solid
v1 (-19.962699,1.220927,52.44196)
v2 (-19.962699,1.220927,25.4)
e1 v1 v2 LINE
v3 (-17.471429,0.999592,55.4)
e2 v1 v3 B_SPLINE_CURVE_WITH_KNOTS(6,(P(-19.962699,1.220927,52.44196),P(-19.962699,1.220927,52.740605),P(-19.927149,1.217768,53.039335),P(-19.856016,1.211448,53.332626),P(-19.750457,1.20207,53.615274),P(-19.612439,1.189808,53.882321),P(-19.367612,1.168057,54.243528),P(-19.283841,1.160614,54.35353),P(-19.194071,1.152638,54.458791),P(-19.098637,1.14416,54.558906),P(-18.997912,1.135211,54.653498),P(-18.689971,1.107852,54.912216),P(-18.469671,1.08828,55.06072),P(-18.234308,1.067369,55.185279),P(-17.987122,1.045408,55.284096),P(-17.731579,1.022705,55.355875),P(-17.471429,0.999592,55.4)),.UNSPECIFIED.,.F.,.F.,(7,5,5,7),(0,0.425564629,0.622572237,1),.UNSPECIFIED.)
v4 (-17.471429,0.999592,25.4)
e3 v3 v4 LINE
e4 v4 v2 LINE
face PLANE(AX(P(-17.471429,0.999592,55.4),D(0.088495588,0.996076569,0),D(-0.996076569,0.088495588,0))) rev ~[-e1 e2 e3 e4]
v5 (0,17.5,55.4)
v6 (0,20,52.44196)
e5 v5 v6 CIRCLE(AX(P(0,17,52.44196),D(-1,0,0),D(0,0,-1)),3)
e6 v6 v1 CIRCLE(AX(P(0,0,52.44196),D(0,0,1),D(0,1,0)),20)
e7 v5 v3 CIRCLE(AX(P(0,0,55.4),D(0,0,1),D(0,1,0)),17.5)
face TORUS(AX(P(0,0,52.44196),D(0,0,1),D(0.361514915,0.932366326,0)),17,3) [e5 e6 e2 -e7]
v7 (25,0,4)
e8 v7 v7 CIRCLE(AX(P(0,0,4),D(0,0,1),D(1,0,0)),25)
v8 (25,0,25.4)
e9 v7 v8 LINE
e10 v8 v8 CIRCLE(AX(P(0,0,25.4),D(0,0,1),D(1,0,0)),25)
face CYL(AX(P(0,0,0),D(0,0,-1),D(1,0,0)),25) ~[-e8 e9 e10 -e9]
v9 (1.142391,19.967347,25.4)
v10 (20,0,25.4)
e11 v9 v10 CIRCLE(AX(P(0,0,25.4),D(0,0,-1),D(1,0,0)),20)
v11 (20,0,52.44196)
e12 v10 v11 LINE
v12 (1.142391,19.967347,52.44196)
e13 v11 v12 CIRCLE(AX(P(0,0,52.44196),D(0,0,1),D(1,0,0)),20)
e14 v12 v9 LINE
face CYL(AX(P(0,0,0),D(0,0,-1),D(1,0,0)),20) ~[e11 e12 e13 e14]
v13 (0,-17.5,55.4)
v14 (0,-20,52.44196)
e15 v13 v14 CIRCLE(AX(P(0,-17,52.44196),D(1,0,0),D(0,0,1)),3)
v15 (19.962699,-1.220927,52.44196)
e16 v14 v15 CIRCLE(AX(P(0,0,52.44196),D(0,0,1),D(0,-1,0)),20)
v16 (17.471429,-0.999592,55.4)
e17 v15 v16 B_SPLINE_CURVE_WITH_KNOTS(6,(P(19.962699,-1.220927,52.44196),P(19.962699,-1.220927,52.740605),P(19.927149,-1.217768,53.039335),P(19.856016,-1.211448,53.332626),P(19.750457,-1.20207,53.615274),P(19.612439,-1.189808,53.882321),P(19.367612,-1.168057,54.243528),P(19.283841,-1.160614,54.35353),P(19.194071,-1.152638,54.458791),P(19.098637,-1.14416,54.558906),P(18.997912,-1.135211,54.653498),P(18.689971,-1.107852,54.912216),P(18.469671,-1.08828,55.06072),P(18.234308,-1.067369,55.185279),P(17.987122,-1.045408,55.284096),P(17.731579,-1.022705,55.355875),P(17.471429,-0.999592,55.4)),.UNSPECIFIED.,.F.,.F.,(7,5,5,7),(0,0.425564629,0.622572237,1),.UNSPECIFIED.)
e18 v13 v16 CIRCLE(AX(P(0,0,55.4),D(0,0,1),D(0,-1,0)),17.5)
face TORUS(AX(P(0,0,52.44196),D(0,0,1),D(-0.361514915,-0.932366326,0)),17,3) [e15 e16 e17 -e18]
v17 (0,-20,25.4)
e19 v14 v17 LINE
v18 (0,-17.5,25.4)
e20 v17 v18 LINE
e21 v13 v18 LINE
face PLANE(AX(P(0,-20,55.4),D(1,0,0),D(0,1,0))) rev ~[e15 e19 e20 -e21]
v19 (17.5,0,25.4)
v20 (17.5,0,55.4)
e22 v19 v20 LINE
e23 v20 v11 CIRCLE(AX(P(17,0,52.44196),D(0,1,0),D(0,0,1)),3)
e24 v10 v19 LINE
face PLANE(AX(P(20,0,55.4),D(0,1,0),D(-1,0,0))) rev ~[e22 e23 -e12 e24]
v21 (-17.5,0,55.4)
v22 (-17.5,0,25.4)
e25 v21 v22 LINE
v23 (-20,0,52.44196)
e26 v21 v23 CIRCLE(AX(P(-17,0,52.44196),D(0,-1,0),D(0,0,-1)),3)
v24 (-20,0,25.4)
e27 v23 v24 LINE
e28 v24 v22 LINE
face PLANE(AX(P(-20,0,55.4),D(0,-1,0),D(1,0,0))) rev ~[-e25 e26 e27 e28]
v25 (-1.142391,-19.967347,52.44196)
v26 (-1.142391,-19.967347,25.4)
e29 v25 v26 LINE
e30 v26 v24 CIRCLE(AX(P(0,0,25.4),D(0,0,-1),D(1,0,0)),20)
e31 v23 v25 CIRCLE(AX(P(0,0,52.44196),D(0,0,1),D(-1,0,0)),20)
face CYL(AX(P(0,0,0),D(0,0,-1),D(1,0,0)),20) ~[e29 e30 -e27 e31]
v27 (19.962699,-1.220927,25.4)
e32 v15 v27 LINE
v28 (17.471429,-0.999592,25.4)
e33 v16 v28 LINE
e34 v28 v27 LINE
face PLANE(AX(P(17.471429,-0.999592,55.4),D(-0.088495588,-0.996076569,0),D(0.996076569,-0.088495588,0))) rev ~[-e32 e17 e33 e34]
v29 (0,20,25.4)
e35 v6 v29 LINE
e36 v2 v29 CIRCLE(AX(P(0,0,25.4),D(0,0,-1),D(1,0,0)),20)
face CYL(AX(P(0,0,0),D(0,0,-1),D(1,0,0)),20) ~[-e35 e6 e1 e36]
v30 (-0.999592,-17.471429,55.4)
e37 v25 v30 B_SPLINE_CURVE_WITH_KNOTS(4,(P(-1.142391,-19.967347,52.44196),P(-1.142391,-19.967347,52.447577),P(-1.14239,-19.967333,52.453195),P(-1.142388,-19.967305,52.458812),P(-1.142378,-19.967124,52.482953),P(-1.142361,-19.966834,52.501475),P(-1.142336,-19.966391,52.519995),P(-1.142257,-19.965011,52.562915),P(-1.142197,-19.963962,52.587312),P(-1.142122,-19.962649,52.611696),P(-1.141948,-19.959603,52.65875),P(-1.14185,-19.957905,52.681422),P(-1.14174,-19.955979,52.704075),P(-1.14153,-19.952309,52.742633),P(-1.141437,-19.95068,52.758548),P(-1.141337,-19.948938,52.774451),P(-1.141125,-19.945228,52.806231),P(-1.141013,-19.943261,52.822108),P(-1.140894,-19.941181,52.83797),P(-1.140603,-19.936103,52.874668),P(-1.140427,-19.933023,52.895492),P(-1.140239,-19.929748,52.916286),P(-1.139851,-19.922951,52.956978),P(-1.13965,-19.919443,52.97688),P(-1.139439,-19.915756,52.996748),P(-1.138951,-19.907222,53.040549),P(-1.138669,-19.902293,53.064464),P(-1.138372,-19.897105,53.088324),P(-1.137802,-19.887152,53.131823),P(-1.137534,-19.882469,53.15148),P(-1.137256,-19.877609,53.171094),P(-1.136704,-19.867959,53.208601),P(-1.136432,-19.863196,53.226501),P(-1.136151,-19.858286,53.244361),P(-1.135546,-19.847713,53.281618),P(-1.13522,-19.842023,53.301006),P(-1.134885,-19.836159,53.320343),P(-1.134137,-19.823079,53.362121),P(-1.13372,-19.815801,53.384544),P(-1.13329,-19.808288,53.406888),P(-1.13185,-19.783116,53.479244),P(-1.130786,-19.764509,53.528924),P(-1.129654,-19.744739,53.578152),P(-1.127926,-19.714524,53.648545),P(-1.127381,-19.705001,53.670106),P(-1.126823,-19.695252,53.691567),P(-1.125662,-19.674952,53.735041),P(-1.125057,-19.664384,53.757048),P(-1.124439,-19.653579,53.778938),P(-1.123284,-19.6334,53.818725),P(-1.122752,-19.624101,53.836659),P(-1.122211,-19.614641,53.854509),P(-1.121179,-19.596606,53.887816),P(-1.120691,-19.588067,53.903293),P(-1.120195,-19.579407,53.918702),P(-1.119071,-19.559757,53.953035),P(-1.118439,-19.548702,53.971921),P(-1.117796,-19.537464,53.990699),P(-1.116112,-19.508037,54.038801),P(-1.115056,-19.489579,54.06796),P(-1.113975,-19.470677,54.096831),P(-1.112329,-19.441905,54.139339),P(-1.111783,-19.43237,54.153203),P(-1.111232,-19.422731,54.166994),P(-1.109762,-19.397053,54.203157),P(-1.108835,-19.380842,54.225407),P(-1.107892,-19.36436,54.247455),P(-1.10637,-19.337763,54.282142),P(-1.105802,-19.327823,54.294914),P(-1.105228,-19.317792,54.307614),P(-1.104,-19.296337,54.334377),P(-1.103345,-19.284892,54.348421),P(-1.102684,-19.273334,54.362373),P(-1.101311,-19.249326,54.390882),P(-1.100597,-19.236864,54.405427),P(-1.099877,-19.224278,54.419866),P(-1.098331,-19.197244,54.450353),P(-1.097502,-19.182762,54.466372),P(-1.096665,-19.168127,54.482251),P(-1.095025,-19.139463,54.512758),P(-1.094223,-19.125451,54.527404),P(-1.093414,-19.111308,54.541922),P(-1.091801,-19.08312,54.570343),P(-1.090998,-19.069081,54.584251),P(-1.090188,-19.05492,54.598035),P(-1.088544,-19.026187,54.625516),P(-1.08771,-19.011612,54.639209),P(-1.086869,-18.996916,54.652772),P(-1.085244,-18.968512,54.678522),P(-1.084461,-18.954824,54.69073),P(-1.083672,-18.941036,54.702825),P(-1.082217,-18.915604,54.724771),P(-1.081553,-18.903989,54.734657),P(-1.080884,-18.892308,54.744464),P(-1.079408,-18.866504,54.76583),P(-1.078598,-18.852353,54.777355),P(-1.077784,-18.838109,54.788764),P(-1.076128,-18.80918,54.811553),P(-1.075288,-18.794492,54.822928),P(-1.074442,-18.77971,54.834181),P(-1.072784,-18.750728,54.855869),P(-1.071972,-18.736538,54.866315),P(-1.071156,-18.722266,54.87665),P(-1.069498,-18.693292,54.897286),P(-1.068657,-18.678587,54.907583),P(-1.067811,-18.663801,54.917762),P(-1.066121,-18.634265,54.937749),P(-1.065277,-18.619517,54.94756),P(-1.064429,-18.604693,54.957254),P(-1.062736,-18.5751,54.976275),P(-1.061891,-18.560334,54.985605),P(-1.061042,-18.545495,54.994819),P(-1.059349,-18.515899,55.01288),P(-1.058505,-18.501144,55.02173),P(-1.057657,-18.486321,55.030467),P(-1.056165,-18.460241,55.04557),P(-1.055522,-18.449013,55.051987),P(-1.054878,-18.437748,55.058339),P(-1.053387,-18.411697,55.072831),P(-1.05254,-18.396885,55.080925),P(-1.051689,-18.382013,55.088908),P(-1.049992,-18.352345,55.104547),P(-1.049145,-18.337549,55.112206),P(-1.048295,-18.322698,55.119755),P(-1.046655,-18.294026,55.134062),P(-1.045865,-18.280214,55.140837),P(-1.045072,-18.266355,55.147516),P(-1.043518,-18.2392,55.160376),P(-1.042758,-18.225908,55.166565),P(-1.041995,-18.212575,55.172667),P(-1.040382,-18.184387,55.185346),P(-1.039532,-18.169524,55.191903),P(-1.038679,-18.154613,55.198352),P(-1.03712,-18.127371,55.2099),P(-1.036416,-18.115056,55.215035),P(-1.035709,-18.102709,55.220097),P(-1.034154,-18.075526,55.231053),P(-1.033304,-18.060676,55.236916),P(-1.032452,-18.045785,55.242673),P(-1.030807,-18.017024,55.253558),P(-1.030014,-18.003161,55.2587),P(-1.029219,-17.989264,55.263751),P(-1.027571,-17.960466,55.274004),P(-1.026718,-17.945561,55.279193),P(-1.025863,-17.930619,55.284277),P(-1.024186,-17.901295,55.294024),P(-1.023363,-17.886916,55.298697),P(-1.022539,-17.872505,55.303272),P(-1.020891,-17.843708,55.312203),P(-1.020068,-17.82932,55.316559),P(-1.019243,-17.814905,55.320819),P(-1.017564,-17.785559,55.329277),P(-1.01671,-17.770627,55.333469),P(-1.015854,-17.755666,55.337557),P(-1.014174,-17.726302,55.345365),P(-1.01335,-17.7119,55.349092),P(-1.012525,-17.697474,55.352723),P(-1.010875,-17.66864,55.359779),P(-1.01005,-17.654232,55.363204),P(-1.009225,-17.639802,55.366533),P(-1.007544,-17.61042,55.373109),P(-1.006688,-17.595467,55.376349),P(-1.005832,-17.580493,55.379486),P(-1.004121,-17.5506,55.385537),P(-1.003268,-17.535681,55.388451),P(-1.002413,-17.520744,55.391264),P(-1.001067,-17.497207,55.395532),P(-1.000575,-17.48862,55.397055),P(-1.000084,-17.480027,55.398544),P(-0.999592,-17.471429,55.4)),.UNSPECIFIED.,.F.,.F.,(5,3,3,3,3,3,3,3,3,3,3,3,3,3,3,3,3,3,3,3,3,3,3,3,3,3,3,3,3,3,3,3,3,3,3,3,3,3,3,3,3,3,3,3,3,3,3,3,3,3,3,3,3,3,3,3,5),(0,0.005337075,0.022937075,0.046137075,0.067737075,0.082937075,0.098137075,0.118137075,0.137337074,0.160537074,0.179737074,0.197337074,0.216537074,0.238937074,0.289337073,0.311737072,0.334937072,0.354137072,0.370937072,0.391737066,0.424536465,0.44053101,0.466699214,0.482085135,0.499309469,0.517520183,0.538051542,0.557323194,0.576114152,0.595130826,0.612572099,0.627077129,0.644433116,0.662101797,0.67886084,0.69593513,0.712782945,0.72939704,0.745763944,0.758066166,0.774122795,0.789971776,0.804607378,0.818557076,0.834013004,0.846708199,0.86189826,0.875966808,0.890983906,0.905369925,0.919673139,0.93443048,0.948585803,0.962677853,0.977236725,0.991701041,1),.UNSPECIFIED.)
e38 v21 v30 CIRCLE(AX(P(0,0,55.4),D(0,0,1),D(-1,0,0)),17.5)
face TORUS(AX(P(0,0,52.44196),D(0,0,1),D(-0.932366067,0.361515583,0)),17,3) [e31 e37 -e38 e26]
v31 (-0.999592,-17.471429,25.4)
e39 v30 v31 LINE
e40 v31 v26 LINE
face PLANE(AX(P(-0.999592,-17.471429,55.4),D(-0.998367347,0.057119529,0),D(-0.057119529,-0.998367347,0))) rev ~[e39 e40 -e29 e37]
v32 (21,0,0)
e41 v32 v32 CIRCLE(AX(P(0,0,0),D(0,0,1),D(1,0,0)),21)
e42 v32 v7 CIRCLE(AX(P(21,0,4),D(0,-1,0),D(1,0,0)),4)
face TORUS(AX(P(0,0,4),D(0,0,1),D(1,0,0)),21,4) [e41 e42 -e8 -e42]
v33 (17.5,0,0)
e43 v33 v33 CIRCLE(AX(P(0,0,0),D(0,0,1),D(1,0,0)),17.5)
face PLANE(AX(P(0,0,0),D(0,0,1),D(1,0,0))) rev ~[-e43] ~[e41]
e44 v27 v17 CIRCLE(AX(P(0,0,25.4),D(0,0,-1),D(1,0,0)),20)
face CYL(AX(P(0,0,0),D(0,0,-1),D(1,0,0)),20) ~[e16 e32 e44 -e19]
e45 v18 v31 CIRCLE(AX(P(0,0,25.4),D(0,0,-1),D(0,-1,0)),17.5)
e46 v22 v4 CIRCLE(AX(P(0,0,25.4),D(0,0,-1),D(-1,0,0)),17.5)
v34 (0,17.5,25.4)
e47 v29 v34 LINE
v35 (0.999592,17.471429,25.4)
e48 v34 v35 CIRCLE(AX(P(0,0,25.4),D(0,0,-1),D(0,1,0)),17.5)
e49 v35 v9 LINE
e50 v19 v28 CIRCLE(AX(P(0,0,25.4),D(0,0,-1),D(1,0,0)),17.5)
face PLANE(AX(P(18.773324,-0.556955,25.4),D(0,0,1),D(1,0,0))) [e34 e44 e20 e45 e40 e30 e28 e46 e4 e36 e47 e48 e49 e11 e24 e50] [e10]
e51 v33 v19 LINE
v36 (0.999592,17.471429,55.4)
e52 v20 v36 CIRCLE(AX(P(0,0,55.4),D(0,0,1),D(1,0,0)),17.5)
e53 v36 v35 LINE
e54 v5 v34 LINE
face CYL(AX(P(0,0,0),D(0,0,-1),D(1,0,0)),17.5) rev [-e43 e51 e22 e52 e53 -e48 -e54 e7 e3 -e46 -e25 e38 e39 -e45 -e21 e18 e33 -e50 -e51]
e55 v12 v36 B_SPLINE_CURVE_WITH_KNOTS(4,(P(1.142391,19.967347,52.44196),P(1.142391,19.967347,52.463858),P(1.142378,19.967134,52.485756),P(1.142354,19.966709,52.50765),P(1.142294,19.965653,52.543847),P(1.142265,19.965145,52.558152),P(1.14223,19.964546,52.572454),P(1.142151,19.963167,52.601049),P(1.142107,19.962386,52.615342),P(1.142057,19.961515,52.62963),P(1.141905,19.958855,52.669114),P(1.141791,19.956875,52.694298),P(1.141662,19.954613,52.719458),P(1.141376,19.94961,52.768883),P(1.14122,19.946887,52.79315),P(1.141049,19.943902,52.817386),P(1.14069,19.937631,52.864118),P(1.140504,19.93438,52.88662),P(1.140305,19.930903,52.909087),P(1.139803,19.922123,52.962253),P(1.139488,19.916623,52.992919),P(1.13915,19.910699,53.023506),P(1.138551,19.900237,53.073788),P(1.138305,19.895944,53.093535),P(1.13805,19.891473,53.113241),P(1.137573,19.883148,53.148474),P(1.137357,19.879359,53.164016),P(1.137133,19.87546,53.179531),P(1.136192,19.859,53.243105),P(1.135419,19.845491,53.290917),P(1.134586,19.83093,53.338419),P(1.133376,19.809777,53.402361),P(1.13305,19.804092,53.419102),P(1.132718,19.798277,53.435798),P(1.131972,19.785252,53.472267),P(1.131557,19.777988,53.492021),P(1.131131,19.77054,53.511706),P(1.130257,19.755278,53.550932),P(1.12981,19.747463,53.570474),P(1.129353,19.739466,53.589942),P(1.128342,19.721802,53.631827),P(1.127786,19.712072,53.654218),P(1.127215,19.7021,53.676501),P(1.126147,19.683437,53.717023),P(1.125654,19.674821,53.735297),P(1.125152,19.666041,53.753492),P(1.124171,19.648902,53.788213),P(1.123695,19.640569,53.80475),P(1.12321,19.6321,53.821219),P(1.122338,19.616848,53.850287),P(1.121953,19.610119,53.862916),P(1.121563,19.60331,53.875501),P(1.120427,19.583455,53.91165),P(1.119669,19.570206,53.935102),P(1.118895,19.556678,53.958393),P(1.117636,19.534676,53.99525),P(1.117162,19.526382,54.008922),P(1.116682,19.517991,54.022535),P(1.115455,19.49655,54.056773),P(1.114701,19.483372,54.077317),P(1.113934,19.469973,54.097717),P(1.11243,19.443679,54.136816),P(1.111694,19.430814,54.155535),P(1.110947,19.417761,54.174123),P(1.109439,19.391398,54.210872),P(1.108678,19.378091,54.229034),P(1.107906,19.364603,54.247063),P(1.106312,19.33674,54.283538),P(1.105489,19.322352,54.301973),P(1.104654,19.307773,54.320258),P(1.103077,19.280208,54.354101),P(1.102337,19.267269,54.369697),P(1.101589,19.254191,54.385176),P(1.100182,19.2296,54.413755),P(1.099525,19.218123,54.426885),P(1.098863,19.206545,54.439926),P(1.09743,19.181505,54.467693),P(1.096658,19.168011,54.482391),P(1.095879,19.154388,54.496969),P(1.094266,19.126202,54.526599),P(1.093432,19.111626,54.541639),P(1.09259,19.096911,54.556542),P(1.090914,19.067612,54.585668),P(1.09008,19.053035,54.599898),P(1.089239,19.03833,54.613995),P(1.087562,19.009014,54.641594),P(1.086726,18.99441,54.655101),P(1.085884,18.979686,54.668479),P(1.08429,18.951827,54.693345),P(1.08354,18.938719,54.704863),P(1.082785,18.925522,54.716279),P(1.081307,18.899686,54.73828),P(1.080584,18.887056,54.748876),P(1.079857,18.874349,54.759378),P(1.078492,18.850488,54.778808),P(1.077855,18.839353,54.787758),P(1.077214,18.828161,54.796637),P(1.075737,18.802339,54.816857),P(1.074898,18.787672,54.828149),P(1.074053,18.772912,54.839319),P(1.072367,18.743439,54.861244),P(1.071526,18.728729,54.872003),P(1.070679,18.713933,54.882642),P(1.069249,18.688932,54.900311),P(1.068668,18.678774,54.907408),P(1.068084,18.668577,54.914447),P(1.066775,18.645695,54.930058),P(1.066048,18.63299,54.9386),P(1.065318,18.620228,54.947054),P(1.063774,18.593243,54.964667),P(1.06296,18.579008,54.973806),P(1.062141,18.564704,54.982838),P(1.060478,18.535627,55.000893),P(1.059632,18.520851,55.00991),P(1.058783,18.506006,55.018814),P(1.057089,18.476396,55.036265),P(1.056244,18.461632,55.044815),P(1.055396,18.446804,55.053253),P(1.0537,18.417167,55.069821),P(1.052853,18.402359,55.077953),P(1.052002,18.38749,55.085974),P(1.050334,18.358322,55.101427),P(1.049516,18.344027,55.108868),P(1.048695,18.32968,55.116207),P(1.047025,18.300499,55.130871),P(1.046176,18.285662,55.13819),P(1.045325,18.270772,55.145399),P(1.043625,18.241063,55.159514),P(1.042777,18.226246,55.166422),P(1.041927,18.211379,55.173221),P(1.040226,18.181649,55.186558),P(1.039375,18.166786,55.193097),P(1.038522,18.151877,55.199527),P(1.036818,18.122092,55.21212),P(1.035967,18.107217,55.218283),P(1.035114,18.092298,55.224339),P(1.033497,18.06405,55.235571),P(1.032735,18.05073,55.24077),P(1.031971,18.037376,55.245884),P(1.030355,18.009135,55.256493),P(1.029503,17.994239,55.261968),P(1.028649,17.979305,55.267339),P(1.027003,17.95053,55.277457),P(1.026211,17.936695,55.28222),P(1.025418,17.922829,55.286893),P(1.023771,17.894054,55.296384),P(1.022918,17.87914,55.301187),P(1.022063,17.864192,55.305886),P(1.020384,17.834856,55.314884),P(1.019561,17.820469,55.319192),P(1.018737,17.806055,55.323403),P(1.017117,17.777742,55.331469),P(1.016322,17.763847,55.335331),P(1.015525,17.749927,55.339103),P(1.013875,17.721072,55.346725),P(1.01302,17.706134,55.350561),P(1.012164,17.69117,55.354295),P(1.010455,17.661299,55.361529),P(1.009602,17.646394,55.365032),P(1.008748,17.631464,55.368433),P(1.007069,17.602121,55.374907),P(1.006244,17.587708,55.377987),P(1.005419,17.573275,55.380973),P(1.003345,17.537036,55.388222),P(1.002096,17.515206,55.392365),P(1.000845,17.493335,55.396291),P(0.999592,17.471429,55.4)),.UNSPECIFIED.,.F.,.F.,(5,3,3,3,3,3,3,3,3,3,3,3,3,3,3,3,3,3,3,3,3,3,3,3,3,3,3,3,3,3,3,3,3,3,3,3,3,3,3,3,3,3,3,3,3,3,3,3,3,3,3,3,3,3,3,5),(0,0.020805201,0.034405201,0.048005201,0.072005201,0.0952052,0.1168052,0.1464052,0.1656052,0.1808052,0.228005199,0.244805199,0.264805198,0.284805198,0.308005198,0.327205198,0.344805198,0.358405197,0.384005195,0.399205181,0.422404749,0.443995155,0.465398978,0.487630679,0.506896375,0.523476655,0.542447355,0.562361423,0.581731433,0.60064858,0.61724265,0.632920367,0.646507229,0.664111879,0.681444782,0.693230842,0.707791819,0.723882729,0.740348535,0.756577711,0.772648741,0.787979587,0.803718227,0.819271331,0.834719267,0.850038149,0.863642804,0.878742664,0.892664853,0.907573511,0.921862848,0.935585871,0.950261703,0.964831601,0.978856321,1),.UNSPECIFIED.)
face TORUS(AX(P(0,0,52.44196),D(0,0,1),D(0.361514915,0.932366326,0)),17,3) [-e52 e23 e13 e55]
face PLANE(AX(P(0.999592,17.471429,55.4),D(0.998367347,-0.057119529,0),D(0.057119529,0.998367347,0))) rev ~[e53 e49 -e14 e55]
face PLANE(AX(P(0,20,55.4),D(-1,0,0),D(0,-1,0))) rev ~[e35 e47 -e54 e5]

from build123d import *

# Parameters (mm, degrees)
F0_R        = 25
F0_R_2      = 20
F0_R_3      = 17.5
F1_DEPTH    = 25.4
F2_DEPTH    = 55.4
F4_DEPTH    = 30
F5_T2_ANGLE = 128.886649626
F5_T4_ANGLE = 129.1121145727
F5_T6_ANGLE = 128.886649626
F5_T8_ANGLE = 129.1121145727
F6_R        = 4


# Not quite as in the source:
# - a fillet or chamfer that OpenCascade refuses, or shapes differently, is made with other operations: its cross-section is extruded or revolved along the edge and cut away or added


with BuildPart() as f1:
    # F0 (on Top) → F1 (new body)
    with BuildSketch(Plane.XY):
        Circle(F0_R)
        Circle(F0_R_2, mode=Mode.SUBTRACT)
        Circle(F0_R_2)
        Circle(F0_R_3, mode=Mode.SUBTRACT)
    extrude(amount=F1_DEPTH)

    # F0 (on Top) → F2 (join)
    with BuildSketch(Plane.XY):
        Circle(F0_R_2)
        Circle(F0_R_3, mode=Mode.SUBTRACT)
    extrude(amount=F2_DEPTH)

    # F3 (on face) → F4 (cut)
    with BuildSketch(Plane.XY.offset(55.4)):
        with BuildLine():
            Line((0, 20), (0, 17.5))
            ThreePointArc((0, 17.5), (0.5, 17.4928556845), (0.9995917534, 17.4714285714))
            Line((0.9995917534, 17.4714285714), (1.1423905753, 19.9673469388))
            ThreePointArc((1.1423905753, 19.9673469388), (0.5714285714, 19.991835068), (0, 20))
        make_face()
        with BuildLine():
            Line((20, 0), (17.5, 0))
            ThreePointArc((17.5, 0), (17.4928556845, -0.5), (17.4714285714, -0.9995917534))
            Line((17.4714285714, -0.9995917534), (19.9626986738, -1.2209265568))
            ThreePointArc((19.9626986738, -1.2209265568), (19.9906724934, -0.6107481163), (20, 0))
        make_face()
        with BuildLine():
            ThreePointArc((-17.5, 0), (-17.4928556845, 0.5), (-17.4714285714, 0.9995917534))
            Line((-17.4714285714, 0.9995917534), (-19.9626986738, 1.2209265568))
            ThreePointArc((-19.9626986738, 1.2209265568), (-19.9906724934, 0.6107481163), (-20, 0))
            Line((-20, 0), (-17.5, 0))
        make_face()
        with BuildLine():
            ThreePointArc((0, -17.5), (-0.5, -17.4928556845), (-0.9995917534, -17.4714285714))
            Line((-0.9995917534, -17.4714285714), (-1.1423905753, -19.9673469388))
            ThreePointArc((-1.1423905753, -19.9673469388), (-0.5714285714, -19.991835068), (0, -20))
            Line((0, -20), (0, -17.5))
        make_face()
    extrude(amount=-F4_DEPTH, mode=Mode.SUBTRACT)

    # F5: fillet of radius 3 on 4 edges, made by hand

    # F5_s1 → F5_t2 (revolve, cut)
    with BuildSketch(Plane(origin=(0, 0, 0), x_dir=(0, 0, 1), z_dir=(0.9323663261, -0.3615149152, 0))):
        with BuildLine():
            ThreePointArc((52.4419601084, -20), (54.3784517816, -19.2912878475), (55.4, -17.5))
            Line((55.4, -17.5), (55.4, -20))
            Line((55.4, -20), (52.4419601084, -20))
        make_face()
    revolve(axis=Axis((0, 0, 55.4), (0, 0, 1)), revolution_arc=F5_T2_ANGLE, mode=Mode.SUBTRACT)

    # F5_s3 → F5_t4 (revolve, cut)
    with BuildSketch(Plane(origin=(0, 0, 0), x_dir=(0, 0, 1), z_dir=(0.3615155829, 0.9323660672, 0))):
        with BuildLine():
            ThreePointArc((52.4419601084, -20), (54.3784517816, -19.2912878475), (55.4, -17.5))
            Line((55.4, -17.5), (55.4, -20))
            Line((55.4, -20), (52.4419601084, -20))
        make_face()
    revolve(axis=Axis((0, 0, 55.4), (0, 0, 1)), revolution_arc=F5_T4_ANGLE, mode=Mode.SUBTRACT)

    # F5_s5 → F5_t6 (revolve, cut)
    with BuildSketch(Plane(origin=(0, 0, 0), x_dir=(0, 0, 1), z_dir=(-0.9323663261, 0.3615149152, 0))):
        with BuildLine():
            ThreePointArc((52.4419601084, -20), (54.3784517816, -19.2912878475), (55.4, -17.5))
            Line((55.4, -17.5), (55.4, -20))
            Line((55.4, -20), (52.4419601084, -20))
        make_face()
    revolve(axis=Axis((0, 0, 55.4), (0, 0, 1)), revolution_arc=F5_T6_ANGLE, mode=Mode.SUBTRACT)

    # F5_s7 → F5_t8 (revolve, cut)
    with BuildSketch(Plane(origin=(0, 0, 0), x_dir=(0, 0, 1), z_dir=(-0.3615155829, -0.9323660672, 0))):
        with BuildLine():
            ThreePointArc((52.4419601084, -20), (54.3784517816, -19.2912878475), (55.4, -17.5))
            Line((55.4, -17.5), (55.4, -20))
            Line((55.4, -20), (52.4419601084, -20))
        make_face()
    revolve(axis=Axis((0, 0, 55.4), (0, 0, 1)), revolution_arc=F5_T8_ANGLE, mode=Mode.SUBTRACT)

    # F6
    f6_edges = [f1.edges().sort_by_distance(p)[0] for p in [
        (-25, 0, 0),
    ]]
    fillet(f6_edges, radius=F6_R)


solid = f1.part
